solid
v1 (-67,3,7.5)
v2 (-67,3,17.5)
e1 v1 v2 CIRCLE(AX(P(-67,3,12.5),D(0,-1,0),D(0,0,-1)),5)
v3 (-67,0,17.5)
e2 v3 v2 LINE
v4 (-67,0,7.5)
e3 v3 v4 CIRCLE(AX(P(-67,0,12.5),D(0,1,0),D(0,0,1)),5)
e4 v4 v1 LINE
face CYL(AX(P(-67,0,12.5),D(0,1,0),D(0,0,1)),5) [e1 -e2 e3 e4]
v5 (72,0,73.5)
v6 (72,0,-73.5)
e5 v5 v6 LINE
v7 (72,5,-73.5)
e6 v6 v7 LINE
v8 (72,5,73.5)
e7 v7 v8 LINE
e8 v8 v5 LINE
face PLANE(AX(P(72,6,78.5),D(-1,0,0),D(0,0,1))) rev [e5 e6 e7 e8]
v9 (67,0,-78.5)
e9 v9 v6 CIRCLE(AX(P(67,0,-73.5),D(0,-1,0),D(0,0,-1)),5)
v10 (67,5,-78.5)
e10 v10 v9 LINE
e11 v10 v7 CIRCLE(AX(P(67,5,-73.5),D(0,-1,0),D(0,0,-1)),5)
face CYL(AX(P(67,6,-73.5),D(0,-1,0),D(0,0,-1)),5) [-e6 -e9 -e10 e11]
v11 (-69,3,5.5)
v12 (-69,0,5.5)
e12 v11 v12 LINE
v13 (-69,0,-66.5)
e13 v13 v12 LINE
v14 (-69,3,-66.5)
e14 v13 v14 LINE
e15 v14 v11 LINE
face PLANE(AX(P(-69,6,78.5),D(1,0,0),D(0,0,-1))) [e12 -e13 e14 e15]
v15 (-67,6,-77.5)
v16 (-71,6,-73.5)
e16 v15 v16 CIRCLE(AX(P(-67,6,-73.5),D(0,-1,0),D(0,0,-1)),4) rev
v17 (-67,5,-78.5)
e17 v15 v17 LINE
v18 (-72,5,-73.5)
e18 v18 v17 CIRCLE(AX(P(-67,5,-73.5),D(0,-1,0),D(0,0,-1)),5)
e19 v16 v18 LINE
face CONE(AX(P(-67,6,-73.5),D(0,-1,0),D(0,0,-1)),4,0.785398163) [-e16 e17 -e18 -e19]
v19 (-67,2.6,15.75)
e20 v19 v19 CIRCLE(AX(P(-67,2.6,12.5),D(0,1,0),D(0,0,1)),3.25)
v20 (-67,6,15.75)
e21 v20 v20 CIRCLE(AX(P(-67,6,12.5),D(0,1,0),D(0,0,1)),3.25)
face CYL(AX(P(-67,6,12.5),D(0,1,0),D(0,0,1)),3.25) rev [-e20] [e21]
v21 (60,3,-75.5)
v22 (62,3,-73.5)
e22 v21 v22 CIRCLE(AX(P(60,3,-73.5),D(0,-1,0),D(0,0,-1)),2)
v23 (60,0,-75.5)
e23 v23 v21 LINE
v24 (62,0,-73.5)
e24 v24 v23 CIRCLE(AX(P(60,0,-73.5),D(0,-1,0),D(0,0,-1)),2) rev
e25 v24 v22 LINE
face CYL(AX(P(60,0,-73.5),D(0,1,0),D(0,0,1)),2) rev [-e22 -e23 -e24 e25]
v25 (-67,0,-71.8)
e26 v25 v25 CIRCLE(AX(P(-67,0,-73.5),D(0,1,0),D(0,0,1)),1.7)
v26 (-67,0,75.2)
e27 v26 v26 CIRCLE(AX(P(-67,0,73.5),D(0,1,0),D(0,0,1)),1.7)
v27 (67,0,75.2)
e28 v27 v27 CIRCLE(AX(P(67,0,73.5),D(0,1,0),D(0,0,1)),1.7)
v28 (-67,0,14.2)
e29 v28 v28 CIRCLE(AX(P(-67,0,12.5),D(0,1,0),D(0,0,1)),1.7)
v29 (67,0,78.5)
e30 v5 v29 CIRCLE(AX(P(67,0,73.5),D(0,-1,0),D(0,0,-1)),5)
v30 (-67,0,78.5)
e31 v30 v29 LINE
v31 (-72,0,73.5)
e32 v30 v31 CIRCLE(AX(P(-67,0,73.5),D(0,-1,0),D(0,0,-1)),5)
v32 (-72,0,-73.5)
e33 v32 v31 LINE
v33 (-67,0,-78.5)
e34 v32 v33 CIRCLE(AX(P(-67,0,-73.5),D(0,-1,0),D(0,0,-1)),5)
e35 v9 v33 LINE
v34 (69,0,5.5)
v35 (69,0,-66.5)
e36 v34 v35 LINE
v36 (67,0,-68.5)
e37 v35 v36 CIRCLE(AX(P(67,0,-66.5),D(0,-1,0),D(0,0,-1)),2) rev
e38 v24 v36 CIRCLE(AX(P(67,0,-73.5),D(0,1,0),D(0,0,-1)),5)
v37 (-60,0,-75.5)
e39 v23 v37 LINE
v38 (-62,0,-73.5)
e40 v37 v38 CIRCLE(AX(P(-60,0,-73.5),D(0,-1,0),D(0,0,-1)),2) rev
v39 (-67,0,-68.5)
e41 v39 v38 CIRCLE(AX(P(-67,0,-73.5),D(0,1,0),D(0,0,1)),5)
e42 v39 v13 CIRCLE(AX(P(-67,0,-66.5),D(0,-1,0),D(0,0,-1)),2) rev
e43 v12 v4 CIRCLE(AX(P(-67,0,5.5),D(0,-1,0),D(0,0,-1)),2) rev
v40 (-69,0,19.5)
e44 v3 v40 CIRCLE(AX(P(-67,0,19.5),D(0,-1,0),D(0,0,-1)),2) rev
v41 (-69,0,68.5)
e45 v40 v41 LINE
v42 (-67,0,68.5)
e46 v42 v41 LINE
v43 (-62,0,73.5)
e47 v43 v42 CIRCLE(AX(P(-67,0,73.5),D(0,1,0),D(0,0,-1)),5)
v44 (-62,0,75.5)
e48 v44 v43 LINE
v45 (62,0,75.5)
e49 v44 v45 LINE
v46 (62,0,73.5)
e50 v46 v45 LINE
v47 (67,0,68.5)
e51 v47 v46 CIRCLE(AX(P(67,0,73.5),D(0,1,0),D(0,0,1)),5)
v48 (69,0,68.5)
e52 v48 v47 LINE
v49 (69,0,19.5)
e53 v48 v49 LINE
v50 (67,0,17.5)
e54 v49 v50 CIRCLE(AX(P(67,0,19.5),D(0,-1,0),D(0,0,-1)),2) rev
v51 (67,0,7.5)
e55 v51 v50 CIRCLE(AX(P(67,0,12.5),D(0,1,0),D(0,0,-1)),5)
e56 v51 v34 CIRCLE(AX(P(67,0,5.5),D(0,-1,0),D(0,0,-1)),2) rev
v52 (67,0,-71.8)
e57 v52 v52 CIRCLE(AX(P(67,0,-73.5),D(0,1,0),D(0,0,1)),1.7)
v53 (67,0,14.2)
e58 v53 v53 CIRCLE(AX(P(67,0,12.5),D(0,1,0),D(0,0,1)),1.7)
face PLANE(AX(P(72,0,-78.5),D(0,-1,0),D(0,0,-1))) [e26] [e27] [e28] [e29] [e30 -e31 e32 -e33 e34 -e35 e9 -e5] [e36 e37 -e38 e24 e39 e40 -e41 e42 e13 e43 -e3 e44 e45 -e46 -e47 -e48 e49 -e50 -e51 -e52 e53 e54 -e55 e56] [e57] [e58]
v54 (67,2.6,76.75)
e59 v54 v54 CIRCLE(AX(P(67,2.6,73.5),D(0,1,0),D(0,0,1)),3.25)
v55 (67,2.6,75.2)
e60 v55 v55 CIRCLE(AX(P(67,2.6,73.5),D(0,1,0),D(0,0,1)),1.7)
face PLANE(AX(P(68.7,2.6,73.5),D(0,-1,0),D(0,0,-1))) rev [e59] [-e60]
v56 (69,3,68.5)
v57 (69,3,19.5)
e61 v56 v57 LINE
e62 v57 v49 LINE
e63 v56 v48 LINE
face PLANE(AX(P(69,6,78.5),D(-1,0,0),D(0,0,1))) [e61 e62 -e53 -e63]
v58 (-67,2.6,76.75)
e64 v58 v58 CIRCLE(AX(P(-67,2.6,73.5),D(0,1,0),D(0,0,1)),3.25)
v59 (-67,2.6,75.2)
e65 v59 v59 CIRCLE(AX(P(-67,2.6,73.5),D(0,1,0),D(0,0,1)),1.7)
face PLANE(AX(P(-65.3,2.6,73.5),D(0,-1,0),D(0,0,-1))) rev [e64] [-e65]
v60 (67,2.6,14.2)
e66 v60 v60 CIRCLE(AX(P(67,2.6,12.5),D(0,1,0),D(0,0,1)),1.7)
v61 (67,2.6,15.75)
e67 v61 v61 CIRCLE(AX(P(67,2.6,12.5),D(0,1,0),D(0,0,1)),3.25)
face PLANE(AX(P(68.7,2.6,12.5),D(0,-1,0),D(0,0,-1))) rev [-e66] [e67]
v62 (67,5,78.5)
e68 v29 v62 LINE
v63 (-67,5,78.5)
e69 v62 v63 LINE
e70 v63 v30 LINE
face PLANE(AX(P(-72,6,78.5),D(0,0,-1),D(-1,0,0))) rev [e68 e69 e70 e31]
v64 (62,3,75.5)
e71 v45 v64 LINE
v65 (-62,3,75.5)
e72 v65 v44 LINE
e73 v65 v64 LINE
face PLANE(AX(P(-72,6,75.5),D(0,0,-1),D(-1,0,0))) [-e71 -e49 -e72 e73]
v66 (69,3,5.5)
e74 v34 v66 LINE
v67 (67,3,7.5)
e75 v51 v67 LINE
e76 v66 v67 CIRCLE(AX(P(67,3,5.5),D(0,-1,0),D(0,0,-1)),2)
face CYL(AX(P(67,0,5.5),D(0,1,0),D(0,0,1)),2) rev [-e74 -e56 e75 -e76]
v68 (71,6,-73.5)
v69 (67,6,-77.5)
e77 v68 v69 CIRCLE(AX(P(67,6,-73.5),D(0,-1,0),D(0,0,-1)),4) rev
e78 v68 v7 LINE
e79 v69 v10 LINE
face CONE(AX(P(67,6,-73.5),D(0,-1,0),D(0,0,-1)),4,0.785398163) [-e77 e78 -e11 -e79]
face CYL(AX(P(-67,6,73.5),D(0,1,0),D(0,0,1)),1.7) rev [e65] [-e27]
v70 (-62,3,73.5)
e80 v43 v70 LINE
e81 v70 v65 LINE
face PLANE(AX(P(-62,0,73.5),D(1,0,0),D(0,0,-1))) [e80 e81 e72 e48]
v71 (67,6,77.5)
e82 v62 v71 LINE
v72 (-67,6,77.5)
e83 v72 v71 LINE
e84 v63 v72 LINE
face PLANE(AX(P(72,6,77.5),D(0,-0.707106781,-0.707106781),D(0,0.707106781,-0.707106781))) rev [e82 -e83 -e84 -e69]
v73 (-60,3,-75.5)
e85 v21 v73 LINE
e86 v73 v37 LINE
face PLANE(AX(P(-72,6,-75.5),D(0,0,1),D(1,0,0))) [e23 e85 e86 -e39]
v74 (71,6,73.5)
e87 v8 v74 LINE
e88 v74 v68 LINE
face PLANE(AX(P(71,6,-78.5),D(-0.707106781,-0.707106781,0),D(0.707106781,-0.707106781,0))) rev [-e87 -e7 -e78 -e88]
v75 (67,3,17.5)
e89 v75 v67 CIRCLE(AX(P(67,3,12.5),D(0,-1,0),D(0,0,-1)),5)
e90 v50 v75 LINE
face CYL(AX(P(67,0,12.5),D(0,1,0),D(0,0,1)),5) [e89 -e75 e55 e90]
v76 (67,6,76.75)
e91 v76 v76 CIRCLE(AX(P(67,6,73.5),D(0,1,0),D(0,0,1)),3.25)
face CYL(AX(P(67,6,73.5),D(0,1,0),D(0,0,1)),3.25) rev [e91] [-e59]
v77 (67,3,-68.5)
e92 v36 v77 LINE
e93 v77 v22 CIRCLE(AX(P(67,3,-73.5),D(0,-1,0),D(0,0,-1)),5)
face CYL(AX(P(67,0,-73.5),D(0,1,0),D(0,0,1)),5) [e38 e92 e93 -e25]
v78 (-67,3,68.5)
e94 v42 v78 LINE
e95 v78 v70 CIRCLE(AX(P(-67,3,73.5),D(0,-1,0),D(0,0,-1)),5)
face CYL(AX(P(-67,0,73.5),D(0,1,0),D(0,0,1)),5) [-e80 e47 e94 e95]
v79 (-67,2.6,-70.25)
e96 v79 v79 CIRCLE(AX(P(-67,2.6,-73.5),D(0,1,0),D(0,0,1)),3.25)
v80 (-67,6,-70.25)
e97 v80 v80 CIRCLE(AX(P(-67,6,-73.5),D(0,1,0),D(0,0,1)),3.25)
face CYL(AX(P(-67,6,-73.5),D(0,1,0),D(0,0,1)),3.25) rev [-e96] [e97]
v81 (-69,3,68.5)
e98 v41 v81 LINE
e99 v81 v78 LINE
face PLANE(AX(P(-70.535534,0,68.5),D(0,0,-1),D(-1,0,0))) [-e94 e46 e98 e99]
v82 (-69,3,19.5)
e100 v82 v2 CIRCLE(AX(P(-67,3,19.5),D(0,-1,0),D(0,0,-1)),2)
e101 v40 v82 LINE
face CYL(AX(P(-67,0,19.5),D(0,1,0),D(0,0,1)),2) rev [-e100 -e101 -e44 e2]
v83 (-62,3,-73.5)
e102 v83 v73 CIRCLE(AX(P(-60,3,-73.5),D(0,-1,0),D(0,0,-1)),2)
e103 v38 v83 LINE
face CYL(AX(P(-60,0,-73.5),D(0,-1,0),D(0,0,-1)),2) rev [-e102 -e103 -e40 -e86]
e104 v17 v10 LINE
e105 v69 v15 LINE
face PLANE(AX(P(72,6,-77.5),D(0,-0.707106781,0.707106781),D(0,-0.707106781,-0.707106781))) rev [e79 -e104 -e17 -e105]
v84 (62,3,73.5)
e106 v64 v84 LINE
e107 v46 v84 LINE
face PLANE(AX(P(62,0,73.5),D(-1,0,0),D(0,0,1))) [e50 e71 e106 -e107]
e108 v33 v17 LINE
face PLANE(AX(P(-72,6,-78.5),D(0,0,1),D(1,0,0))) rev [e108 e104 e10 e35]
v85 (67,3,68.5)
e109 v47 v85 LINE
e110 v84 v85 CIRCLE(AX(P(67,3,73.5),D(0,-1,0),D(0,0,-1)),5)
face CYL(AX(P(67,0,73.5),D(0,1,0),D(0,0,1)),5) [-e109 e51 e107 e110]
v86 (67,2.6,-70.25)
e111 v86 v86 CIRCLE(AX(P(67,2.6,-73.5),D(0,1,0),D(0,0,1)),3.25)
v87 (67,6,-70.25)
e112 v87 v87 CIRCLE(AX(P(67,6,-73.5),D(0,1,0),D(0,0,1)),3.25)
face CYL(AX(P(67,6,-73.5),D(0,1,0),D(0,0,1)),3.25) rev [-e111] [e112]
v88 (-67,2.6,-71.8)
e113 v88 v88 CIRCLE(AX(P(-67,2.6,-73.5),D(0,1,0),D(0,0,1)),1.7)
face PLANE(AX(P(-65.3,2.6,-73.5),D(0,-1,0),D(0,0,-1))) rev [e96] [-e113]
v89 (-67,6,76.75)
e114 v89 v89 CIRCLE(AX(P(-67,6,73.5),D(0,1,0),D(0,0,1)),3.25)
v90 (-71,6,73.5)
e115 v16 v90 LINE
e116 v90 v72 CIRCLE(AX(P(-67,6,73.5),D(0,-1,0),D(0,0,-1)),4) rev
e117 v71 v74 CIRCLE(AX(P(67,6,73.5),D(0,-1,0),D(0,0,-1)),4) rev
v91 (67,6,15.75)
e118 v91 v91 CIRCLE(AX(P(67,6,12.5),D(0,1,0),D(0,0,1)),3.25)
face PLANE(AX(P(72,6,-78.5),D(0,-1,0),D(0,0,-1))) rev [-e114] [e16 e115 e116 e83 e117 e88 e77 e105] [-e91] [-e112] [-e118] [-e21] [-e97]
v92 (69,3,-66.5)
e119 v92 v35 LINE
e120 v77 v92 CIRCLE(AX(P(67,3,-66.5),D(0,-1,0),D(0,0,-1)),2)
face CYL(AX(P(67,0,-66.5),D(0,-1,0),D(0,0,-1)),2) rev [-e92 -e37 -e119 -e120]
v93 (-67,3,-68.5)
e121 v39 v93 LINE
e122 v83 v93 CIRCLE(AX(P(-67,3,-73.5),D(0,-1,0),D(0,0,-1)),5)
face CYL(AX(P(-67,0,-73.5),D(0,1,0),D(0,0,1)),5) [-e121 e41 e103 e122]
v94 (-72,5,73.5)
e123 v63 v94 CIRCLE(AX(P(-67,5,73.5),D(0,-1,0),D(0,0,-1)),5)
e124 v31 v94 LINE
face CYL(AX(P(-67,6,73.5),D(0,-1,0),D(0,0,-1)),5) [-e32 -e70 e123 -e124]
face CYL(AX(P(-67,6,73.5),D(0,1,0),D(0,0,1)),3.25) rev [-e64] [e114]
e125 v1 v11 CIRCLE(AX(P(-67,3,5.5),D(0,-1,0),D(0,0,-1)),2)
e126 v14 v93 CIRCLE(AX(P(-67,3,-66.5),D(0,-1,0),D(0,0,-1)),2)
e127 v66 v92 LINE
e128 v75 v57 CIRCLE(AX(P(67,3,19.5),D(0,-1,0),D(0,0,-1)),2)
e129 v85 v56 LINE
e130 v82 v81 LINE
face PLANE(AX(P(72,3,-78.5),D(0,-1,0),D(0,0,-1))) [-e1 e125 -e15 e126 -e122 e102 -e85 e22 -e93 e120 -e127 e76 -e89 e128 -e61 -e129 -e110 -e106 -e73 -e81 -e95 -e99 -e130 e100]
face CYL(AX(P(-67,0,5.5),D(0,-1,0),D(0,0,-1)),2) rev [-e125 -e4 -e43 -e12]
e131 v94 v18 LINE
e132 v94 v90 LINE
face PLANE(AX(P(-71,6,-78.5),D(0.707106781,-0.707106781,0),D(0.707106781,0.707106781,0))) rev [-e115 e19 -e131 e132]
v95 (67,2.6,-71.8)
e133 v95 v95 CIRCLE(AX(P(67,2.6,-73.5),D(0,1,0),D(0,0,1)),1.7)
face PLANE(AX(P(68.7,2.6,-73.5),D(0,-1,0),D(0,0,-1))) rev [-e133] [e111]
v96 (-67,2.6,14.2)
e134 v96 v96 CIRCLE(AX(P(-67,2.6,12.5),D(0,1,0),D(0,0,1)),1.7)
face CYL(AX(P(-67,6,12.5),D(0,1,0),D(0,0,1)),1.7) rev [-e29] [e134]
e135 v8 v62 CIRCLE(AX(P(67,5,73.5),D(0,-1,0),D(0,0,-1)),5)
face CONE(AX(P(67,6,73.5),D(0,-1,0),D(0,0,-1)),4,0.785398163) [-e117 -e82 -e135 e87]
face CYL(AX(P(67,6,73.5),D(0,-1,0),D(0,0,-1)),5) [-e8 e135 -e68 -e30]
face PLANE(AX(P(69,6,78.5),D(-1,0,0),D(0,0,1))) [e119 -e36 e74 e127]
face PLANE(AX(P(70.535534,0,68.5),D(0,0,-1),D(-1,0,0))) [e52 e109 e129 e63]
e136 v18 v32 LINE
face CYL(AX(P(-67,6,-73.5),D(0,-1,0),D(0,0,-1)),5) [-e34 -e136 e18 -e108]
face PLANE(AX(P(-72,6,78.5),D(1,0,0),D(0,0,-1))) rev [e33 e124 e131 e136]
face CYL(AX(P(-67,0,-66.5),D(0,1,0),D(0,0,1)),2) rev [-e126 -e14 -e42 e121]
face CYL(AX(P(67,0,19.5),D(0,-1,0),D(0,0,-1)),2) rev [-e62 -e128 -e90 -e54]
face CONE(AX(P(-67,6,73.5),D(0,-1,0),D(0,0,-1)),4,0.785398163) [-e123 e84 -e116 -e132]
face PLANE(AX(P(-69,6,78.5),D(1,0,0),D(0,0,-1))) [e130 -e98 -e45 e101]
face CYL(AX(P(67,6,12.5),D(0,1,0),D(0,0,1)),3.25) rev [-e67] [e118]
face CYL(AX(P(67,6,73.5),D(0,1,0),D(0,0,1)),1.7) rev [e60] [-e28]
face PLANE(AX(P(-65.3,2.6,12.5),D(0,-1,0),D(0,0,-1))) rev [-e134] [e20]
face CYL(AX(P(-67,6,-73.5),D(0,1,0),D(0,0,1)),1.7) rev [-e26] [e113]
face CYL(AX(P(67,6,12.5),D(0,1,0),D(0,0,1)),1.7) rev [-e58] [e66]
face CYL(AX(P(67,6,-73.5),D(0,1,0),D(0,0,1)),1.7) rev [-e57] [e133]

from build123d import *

# Parameters (mm, degrees)
SKETCH_1_W                   = 144
SKETCH_1_H                   = 157
EXTRUDE_1_DEPTH              = 6
FILLET_1_R                   = 5
SHELL_1_T                    = -3
EXTRUDE_2_DEPTH              = 6
HOLE_WIZARD_M3_1_D           = 3.4
HOLE_WIZARD_M3_1_CBORE_D     = 6.5
HOLE_WIZARD_M3_1_CBORE_DEPTH = 3.4
CHAMFER_1_SIZE               = 1
FILLET_4_R                   = 2


with BuildPart() as part:
    # 草图1 → 凸台-拉伸1 (new body)
    with BuildSketch(Plane(origin=(0, 0, 0), x_dir=(1, 0, 0), z_dir=(0, 1, 0))):
        Rectangle(SKETCH_1_W, SKETCH_1_H)
    extrude(amount=EXTRUDE_1_DEPTH)

    # 圆角1
    fillet_1_edges = [part.edges().sort_by_distance(p)[0] for p in [
        (72, 3, 78.5),
        (-72, 3, 78.5),
        (-72, 3, -78.5),
        (72, 3, -78.5),
    ]]
    fillet(fillet_1_edges, radius=FILLET_1_R)

    # 抽壳1
    shell_1_openings = [part.faces().sort_by_distance(p)[0] for p in [
        (0, 0, 0),
    ]]
    offset(amount=SHELL_1_T, openings=shell_1_openings, kind=Kind.INTERSECTION)

    # 草图3 → 凸台-拉伸2 (add)
    with BuildSketch(Plane(origin=(0, 6, 0), x_dir=(1, 0, 0), z_dir=(0, 1, 0))):
        with BuildLine():
            Line((-62, 73.5), (-62, 77.035533906))
            Line((-62, 77.035533906), (-70.535533906, 77.035533906))
            Line((-70.535533906, 77.035533906), (-70.535533906, 68.5))
            Line((-70.535533906, 68.5), (-67, 68.5))
            ThreePointArc((-67, 68.5), (-63.464466094, 69.964466094), (-62, 73.5))
        make_face()
        with BuildLine():
            Line((-67, -7.5), (-72, -7.5))
            Line((-72, -7.5), (-72, -17.5))
            Line((-72, -17.5), (-67, -17.5))
            ThreePointArc((-67, -17.5), (-62, -12.5), (-67, -7.5))
        make_face()
        with BuildLine():
            Line((72, -7.5), (72, -17.5))
            Line((72, -17.5), (67, -17.5))
            ThreePointArc((67, -17.5), (62, -12.5), (67, -7.5))
            Line((67, -7.5), (72, -7.5))
        make_face()
        with BuildLine():
            Line((70.535533906, 68.5), (67, 68.5))
            ThreePointArc((67, 68.5), (63.464466094, 69.964466094), (62, 73.5))
            Line((62, 73.5), (62, 77.035533906))
            Line((62, 77.035533906), (70.535533906, 77.035533906))
            Line((70.535533906, 77.035533906), (70.535533906, 68.5))
        make_face()
        with BuildLine():
            Line((62, -73.5), (62, -77.035533906))
            Line((62, -77.035533906), (70.535533906, -77.035533906))
            Line((70.535533906, -77.035533906), (70.535533906, -68.5))
            Line((70.535533906, -68.5), (67, -68.5))
            ThreePointArc((67, -68.5), (63.464466094, -69.964466094), (62, -73.5))
        make_face()
        with BuildLine():
            Line((-62, -73.5), (-62, -77.035533906))
            Line((-62, -77.035533906), (-70.535533906, -77.035533906))
            Line((-70.535533906, -77.035533906), (-70.535533906, -68.5))
            Line((-70.535533906, -68.5), (-67, -68.5))
            ThreePointArc((-67, -68.5), (-63.464466094, -69.964466094), (-62, -73.5))
        make_face()
    extrude(amount=-EXTRUDE_2_DEPTH)

    # M3 六角凹头螺钉的柱形沉头孔1 (through all)
    with Locations(Plane(origin=(0, 6, 0), x_dir=(-1, 0, 0), z_dir=(0, 1, 0))):
        with Locations((67, 12.5), (67, -73.5), (-67, -73.5), (-67, 12.5), (-67, 73.5), (67, 73.5)):
            CounterBoreHole(HOLE_WIZARD_M3_1_D / 2, HOLE_WIZARD_M3_1_CBORE_D / 2, HOLE_WIZARD_M3_1_CBORE_DEPTH)

    # 倒角1
    chamfer_1_edges = [part.edges().sort_by_distance(p)[0] for p in [
        (72, 6, 0),
        (0, 6, 78.5),
        (0, 6, -78.5),
        (-72, 6, 0),
        (-70.535533906, 6, -77.035533906),
        (70.535533906, 6, -77.035533906),
        (-70.535533906, 6, 77.035533906),
        (70.535533906, 6, 77.035533906),
    ]]
    chamfer(chamfer_1_edges, length=CHAMFER_1_SIZE)

    # 圆角4
    fillet_4_edges = [part.edges().sort_by_distance(p)[0] for p in [
        (69, 1.5, -68.5),
        (62, 1.5, -75.5),
        (69, 1.5, 7.5),
        (69, 1.5, 17.5),
        (-69, 1.5, 17.5),
        (-62, 1.5, -75.5),
        (-69, 1.5, -68.5),
        (-69, 1.5, 7.5),
    ]]
    fillet(fillet_4_edges, radius=FILLET_4_R - 0.0001)  # a hair under: the kernel refuses the full size


solid = part.part
